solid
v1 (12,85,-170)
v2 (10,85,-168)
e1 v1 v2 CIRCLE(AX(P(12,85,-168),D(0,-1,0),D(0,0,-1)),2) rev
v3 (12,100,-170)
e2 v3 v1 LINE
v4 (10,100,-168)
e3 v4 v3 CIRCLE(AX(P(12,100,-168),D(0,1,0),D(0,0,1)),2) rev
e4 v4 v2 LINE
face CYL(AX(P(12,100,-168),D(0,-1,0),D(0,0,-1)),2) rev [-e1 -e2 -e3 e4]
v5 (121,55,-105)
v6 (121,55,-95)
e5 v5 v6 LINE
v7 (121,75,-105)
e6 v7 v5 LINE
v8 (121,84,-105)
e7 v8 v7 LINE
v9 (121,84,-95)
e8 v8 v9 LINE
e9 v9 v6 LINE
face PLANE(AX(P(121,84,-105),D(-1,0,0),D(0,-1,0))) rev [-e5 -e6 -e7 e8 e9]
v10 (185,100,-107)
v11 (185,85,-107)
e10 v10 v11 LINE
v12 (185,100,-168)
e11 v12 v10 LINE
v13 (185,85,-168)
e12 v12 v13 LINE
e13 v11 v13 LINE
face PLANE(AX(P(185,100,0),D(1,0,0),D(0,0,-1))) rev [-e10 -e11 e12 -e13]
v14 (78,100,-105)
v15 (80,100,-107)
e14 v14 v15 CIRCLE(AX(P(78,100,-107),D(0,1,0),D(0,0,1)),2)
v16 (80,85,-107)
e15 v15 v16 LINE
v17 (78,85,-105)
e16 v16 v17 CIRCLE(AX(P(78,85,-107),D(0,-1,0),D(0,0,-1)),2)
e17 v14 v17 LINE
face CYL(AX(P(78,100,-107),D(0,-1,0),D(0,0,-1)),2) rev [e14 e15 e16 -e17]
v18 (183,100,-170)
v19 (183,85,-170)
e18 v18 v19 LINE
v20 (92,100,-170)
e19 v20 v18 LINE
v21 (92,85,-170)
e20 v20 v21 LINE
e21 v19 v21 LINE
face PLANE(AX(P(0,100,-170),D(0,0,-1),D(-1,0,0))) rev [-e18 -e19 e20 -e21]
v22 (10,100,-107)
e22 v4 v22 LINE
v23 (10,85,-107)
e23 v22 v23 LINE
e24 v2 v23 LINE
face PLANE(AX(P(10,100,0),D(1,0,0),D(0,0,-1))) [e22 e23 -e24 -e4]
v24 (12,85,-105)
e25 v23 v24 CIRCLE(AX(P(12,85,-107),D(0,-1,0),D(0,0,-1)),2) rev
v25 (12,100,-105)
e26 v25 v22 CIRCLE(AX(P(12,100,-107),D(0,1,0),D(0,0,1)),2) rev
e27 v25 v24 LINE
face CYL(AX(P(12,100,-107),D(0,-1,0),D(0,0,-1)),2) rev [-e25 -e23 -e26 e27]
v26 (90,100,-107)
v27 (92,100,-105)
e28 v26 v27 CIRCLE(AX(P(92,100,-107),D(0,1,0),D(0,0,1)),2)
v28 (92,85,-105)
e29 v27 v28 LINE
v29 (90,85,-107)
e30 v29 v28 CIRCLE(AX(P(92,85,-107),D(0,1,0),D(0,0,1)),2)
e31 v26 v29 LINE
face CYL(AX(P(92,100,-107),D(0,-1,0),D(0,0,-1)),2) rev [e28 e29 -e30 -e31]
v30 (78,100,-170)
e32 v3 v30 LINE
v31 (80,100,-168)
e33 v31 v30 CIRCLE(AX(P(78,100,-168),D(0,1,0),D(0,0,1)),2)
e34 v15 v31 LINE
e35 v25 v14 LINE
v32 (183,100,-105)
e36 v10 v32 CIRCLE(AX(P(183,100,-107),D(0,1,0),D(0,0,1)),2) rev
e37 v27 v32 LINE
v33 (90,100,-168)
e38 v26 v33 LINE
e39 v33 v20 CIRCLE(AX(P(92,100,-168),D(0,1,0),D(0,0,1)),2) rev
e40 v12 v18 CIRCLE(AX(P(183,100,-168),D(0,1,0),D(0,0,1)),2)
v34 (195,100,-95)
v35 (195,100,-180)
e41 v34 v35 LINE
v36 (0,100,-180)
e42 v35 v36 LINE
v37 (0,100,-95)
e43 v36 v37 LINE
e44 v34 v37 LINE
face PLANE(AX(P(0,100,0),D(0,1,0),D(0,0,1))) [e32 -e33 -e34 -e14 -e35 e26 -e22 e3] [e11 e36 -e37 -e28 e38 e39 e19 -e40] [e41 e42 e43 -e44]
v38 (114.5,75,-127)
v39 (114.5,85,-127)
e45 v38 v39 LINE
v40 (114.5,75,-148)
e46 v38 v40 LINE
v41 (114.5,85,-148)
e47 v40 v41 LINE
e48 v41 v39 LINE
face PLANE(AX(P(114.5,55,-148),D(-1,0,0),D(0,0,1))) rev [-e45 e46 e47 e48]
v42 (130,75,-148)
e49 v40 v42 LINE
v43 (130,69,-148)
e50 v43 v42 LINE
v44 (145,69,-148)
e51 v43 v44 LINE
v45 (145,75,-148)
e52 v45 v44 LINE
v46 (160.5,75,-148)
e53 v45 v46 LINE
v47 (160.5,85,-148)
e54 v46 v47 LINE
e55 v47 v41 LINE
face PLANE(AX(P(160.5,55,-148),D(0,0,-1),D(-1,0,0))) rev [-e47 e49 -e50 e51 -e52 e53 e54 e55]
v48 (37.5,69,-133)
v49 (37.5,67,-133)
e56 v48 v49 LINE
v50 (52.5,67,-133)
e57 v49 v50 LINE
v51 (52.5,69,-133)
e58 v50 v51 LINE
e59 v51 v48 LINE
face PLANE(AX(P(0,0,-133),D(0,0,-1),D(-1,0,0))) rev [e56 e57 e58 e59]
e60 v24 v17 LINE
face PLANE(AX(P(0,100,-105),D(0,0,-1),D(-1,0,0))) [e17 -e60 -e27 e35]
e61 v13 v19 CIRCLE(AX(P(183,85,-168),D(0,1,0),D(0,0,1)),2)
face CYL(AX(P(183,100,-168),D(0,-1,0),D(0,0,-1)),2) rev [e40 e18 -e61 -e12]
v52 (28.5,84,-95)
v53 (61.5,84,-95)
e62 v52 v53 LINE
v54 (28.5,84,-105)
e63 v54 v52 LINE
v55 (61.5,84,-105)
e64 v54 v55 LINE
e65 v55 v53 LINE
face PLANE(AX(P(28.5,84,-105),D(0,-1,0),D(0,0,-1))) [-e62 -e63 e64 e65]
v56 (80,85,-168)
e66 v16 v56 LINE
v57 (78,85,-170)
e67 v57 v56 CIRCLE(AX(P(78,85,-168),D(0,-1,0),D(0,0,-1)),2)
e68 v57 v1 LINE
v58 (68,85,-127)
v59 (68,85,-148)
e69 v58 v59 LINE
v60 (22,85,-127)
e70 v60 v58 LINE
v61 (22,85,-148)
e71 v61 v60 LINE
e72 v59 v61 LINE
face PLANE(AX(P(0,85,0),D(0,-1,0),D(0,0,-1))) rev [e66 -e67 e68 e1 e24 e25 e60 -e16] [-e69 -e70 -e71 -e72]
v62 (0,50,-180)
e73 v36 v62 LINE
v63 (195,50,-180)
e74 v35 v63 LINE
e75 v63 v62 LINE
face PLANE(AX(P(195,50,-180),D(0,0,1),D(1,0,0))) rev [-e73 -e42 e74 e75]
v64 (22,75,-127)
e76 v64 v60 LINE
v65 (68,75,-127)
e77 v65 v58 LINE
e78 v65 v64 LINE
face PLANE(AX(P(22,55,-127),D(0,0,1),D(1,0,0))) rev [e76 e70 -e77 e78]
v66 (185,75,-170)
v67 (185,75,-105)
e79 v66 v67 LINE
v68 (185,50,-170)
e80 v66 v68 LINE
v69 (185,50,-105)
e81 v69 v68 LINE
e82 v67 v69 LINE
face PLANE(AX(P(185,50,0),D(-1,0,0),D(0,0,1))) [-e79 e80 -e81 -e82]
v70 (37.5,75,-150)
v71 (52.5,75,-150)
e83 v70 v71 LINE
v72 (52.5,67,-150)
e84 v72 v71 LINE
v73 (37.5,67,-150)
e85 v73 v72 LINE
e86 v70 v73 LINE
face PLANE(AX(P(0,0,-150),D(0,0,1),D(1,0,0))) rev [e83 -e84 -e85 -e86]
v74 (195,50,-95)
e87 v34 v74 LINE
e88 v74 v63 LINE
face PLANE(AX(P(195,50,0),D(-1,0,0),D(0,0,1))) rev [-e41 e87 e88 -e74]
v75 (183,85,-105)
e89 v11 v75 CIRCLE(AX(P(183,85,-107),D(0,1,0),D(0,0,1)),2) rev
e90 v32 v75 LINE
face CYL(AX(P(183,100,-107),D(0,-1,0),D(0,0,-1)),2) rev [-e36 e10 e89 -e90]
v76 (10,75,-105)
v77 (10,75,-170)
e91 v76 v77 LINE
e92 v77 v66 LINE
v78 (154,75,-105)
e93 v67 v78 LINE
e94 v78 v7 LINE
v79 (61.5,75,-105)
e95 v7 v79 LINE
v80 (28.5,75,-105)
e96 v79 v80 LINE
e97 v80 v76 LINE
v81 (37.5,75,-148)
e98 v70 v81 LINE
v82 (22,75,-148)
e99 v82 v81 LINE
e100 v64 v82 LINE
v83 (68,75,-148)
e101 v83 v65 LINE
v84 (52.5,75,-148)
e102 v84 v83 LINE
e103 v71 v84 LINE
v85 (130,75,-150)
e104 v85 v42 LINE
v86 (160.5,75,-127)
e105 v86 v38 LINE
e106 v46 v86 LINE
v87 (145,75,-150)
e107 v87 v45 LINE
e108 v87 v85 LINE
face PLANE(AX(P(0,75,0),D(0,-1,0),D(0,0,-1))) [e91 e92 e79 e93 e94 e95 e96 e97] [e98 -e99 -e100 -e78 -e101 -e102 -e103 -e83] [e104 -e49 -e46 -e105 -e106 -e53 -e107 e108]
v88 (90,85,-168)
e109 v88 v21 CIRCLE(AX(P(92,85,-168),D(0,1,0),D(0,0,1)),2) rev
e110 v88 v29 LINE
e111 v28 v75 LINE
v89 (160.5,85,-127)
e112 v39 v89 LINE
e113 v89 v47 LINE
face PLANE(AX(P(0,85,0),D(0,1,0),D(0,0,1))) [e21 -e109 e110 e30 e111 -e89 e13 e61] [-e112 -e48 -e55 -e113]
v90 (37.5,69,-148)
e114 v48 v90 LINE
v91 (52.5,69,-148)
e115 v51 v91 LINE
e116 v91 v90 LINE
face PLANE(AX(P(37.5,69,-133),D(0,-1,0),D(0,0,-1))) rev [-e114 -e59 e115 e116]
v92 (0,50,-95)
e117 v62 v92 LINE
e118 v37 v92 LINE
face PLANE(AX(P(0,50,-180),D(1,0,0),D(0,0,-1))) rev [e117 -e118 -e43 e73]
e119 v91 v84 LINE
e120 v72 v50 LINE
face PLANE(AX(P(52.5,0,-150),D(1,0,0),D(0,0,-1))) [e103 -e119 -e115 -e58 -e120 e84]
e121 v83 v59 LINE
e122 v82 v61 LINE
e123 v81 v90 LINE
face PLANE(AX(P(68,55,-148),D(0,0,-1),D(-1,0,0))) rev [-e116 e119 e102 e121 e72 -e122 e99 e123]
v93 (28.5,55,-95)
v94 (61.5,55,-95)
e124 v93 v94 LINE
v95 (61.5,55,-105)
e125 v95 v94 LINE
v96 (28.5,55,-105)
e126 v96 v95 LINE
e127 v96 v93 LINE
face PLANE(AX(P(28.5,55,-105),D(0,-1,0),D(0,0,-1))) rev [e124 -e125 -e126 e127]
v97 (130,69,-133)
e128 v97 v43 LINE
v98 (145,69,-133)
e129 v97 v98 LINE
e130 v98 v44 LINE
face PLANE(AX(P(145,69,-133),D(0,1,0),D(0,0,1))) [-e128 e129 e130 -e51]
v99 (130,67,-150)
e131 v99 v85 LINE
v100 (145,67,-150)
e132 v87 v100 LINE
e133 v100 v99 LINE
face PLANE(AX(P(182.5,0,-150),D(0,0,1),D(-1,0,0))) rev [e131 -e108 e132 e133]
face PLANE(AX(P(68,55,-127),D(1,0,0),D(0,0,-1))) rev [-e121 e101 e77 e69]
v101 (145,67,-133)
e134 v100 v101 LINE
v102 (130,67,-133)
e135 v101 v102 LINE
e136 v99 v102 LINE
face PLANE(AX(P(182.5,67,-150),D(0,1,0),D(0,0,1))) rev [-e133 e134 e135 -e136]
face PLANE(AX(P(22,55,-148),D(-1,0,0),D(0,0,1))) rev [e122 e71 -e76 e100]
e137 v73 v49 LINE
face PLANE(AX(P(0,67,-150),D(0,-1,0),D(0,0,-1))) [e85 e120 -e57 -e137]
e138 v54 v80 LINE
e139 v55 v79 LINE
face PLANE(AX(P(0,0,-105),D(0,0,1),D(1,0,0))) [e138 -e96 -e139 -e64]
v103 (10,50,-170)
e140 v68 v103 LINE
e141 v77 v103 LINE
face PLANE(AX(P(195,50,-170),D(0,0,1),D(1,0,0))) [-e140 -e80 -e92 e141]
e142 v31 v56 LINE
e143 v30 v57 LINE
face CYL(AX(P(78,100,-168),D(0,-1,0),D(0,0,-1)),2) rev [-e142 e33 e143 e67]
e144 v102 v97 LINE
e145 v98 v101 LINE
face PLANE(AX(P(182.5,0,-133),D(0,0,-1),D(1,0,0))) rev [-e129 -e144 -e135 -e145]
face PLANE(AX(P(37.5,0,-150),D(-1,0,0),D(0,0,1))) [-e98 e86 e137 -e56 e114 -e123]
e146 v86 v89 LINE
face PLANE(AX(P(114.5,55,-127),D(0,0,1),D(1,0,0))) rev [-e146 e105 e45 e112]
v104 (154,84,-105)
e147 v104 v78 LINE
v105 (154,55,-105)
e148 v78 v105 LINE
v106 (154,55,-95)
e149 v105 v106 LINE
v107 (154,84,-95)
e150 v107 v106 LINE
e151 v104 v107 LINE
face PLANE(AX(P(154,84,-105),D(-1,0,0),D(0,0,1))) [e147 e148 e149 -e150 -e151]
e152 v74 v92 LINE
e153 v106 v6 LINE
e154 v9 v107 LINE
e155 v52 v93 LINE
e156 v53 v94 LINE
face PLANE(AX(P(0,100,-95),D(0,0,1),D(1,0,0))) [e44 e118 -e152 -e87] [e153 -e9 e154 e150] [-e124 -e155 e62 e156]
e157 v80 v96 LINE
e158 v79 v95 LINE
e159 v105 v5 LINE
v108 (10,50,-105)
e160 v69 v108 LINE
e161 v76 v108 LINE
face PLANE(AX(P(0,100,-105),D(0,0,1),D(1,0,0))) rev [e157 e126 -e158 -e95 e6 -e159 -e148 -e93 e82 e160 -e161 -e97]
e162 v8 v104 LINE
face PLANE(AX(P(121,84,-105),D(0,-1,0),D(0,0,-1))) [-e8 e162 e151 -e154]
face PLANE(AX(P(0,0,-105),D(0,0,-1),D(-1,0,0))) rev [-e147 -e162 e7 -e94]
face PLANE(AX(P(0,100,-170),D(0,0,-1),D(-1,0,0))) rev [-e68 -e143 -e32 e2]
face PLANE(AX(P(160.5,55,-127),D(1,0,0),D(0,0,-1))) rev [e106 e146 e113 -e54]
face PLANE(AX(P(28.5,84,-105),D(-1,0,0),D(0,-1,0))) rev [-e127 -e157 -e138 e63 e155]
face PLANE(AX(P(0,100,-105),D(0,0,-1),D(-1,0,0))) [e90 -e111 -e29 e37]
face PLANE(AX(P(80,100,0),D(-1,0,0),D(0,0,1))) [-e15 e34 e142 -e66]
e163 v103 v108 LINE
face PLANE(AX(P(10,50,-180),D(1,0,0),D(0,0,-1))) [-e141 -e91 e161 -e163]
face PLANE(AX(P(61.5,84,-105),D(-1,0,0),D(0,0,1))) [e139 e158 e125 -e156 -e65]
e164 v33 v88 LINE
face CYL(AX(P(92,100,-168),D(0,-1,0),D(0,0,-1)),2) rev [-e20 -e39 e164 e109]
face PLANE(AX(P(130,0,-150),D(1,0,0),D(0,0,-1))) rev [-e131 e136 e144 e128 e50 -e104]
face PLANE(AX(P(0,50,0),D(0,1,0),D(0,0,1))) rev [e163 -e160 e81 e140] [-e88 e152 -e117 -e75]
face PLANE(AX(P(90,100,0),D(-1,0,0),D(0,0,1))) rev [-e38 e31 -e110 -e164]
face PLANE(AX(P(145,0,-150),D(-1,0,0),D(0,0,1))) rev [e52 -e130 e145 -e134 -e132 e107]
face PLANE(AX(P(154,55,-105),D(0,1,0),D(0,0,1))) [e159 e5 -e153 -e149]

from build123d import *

# Parameters (mm, degrees)
SKETCH2_W            = 195
SKETCH2_H            = 180
BOSS_EXTRUDE1_DEPTH  = 50
CUT_EXTRUDE1_DEPTH   = 15
BOSS_EXTRUDE4_DEPTH  = 50
SKETCH14_W           = 70
SKETCH14_H           = 65
SKETCH14_W_2         = 95
BOSS_EXTRUDE8_DEPTH  = 35
SHELL2_OUTLINE_W     = 175
SHELL2_OUTLINE_H     = 65
SHELL2_DEPTH         = 75
SHELL2_2_OUTLINE_W   = 175
SHELL2_2_OUTLINE_H   = 95
SHELL2_2_DEPTH       = 25
SHELL2_START         = 25
SHELL2_3_DEPTH       = 15
SKETCH15_W           = 46
SKETCH15_H           = 21
CUT_EXTRUDE2_DEPTH   = 30
SKETCH16_W           = 46
SKETCH16_H           = 21
CUT_EXTRUDE3_DEPTH   = 30
SKETCH17_W           = 7.5
SKETCH17_H           = 8
BOSS_EXTRUDE9_DEPTH  = 2
SKETCH18_W           = 15
SKETCH18_H           = 2
BOSS_EXTRUDE10_DEPTH = 15
SKETCH19_W           = 33
SKETCH19_H           = 29
CUT_EXTRUDE14_DEPTH  = 10


# Read off the part's stored shape, not the designer's step: Shell2
with BuildPart() as part:
    # Sketch2 → Boss-Extrude1 (new body)
    with BuildSketch(Plane(origin=(0, 0, 0), x_dir=(1, 0, 0), z_dir=(0, 1, 0))):
        with Locations((97.5, 90)):
            Rectangle(SKETCH2_W, SKETCH2_H)
    extrude(amount=BOSS_EXTRUDE1_DEPTH)

    # Sketch3 → Cut-Extrude1 (cut)
    with BuildSketch(Plane(origin=(0, 50, 0), x_dir=(1, 0, 0), z_dir=(0, 1, 0))):
        with BuildLine():
            Line((90, 12), (90, 73))
            ThreePointArc((90, 73), (90.585786438, 74.414213562), (92, 75))
            Line((92, 75), (183, 75))
            ThreePointArc((183, 75), (184.414213562, 74.414213562), (185, 73))
            Line((185, 73), (185, 12))
            ThreePointArc((185, 12), (184.414213562, 10.585786438), (183, 10))
            Line((183, 10), (92, 10))
            ThreePointArc((92, 10), (90.585786438, 10.585786438), (90, 12))
        make_face()
        with BuildLine():
            Line((12, 10), (78, 10))
            ThreePointArc((78, 10), (79.414213562, 10.585786438), (80, 12))
            Line((80, 12), (80, 73))
            ThreePointArc((80, 73), (79.414213562, 74.414213562), (78, 75))
            Line((78, 75), (12, 75))
            ThreePointArc((12, 75), (10.585786438, 74.414213562), (10, 73))
            Line((10, 73), (10, 12))
            ThreePointArc((10, 12), (10.585786438, 10.585786438), (12, 10))
        make_face()
    extrude(amount=-CUT_EXTRUDE1_DEPTH, mode=Mode.SUBTRACT)

    # Sketch6 → Boss-Extrude4 (add)
    with BuildSketch(Plane(origin=(0, 50, 0), x_dir=(1, 0, 0), z_dir=(0, 1, 0))):
        Polygon((0, 180), (185, 180), (195, 180), (195, 95), (185, 95), (0, 95), align=None)
        with BuildLine():
            Line((185, 168), (185, 107))
            ThreePointArc((185, 107), (184.414213562, 105.585786438), (183, 105))
            Line((183, 105), (92, 105))
            ThreePointArc((92, 105), (90.585786438, 105.585786438), (90, 107))
            Line((90, 107), (90, 168))
            ThreePointArc((90, 168), (90.585786438, 169.414213562), (92, 170))
            Line((92, 170), (183, 170))
            ThreePointArc((183, 170), (184.414213562, 169.414213562), (185, 168))
        make_face(mode=Mode.SUBTRACT)
        with BuildLine():
            Line((80, 107), (80, 168))
            ThreePointArc((80, 168), (79.414213562, 169.414213562), (78, 170))
            Line((78, 170), (12, 170))
            ThreePointArc((12, 170), (10.585786438, 169.414213562), (10, 168))
            Line((10, 168), (10, 107))
            ThreePointArc((10, 107), (10.585786438, 105.585786438), (12, 105))
            Line((12, 105), (78, 105))
            ThreePointArc((78, 105), (79.414213562, 105.585786438), (80, 107))
        make_face(mode=Mode.SUBTRACT)
    extrude(amount=BOSS_EXTRUDE4_DEPTH)

    # Sketch14 → Boss-Extrude8 (add)
    with BuildSketch(Plane(origin=(0, 50, 0), x_dir=(1, 0, 0), z_dir=(0, 1, 0))):
        with Locations((45, 137.5)):
            Rectangle(SKETCH14_W, SKETCH14_H)
        with Locations((137.5, 137.5)):
            Rectangle(SKETCH14_W_2, SKETCH14_H)
    extrude(amount=BOSS_EXTRUDE8_DEPTH)

    # Shell2 outline → Shell2 (cut)
    with BuildSketch(Plane(origin=(0, 0, 0), x_dir=(1, 0, 0), z_dir=(0, 1, 0))):
        with Locations((97.5, 137.5)):
            Rectangle(SHELL2_OUTLINE_W, SHELL2_OUTLINE_H)
    extrude(amount=SHELL2_DEPTH, mode=Mode.SUBTRACT)

    # Shell2 2 outline → Shell2 2 (cut)
    with BuildSketch(Plane(origin=(0, 0, 0), x_dir=(1, 0, 0), z_dir=(0, 1, 0))):
        with Locations((97.5, 57.5)):
            Rectangle(SHELL2_2_OUTLINE_W, SHELL2_2_OUTLINE_H)
    extrude(amount=SHELL2_2_DEPTH, mode=Mode.SUBTRACT)

    # Shell2 3 outline → Shell2 3 (cut)
    with BuildSketch(Plane(origin=(0, 0, 0), x_dir=(1, 0, 0), z_dir=(0, 1, 0)).offset(SHELL2_START)):
        with BuildLine():
            Line((10, 105), (10, 84.832159566))
            ThreePointArc((10, 84.832159566), (10.996484877, 84.957966273), (12, 85))
            Line((12, 85), (78, 85))
            ThreePointArc((78, 85), (81.676851089, 84.422817781), (85, 82.746794345))
            ThreePointArc((85, 82.746794345), (88.323148911, 84.422817781), (92, 85))
            Line((92, 85), (183, 85))
            ThreePointArc((183, 85), (184.003515123, 84.957966273), (185, 84.832159566))
            Line((185, 84.832159566), (185, 105))
            Line((185, 105), (10, 105))
        make_face()
    extrude(amount=SHELL2_3_DEPTH, mode=Mode.SUBTRACT)

    # SurfaceCut1
    split(bisect_by=Plane(origin=(0, 50, 0), x_dir=(1, 0, 0), z_dir=(0, 1, 0)), keep=Keep.TOP)

    # Sketch15 → Cut-Extrude2 (cut)
    with BuildSketch(Plane(origin=(0, 85, 0), x_dir=(1, 0, 0), z_dir=(0, 1, 0))):
        with Locations((45, 137.5)):
            Rectangle(SKETCH15_W, SKETCH15_H)
    extrude(amount=-CUT_EXTRUDE2_DEPTH, mode=Mode.SUBTRACT)

    # Sketch16 → Cut-Extrude3 (cut)
    with BuildSketch(Plane(origin=(0, 85, 0), x_dir=(1, 0, 0), z_dir=(0, 1, 0))):
        with Locations((137.5, 137.5)):
            Rectangle(SKETCH16_W, SKETCH16_H)
    extrude(amount=-CUT_EXTRUDE3_DEPTH, mode=Mode.SUBTRACT)

    # Sketch17 → Boss-Extrude9 (add)
    with BuildSketch(Plane.XY.offset(-148)):
        with Locations((41.25, 71)):
            Rectangle(SKETCH17_W, SKETCH17_H)
        with Locations((48.75, 71)):
            Rectangle(SKETCH17_W, SKETCH17_H)
    boss_extrude9 = extrude(amount=-BOSS_EXTRUDE9_DEPTH)

    # Sketch18 → Boss-Extrude10 (add)
    with BuildSketch(Plane.XY.offset(-148)):
        with Locations((45, 68)):
            Rectangle(SKETCH18_W, SKETCH18_H)
    boss_extrude10 = extrude(amount=BOSS_EXTRUDE10_DEPTH)

    # Mirror1: Boss-Extrude9, Boss-Extrude10 across plane
    add(boss_extrude9.mirror(Plane.ZY.offset(-91.25)))
    add(boss_extrude10.mirror(Plane.ZY.offset(-91.25)))

    # Sketch19 → Cut-Extrude14 (cut)
    with BuildSketch(Plane.XY.offset(-95)):
        with Locations((45, 69.5)):
            Rectangle(SKETCH19_W, SKETCH19_H)
        with Locations((137.5, 69.5)):
            Rectangle(SKETCH19_W, SKETCH19_H)
    extrude(amount=-CUT_EXTRUDE14_DEPTH, mode=Mode.SUBTRACT)


solid = part.part
